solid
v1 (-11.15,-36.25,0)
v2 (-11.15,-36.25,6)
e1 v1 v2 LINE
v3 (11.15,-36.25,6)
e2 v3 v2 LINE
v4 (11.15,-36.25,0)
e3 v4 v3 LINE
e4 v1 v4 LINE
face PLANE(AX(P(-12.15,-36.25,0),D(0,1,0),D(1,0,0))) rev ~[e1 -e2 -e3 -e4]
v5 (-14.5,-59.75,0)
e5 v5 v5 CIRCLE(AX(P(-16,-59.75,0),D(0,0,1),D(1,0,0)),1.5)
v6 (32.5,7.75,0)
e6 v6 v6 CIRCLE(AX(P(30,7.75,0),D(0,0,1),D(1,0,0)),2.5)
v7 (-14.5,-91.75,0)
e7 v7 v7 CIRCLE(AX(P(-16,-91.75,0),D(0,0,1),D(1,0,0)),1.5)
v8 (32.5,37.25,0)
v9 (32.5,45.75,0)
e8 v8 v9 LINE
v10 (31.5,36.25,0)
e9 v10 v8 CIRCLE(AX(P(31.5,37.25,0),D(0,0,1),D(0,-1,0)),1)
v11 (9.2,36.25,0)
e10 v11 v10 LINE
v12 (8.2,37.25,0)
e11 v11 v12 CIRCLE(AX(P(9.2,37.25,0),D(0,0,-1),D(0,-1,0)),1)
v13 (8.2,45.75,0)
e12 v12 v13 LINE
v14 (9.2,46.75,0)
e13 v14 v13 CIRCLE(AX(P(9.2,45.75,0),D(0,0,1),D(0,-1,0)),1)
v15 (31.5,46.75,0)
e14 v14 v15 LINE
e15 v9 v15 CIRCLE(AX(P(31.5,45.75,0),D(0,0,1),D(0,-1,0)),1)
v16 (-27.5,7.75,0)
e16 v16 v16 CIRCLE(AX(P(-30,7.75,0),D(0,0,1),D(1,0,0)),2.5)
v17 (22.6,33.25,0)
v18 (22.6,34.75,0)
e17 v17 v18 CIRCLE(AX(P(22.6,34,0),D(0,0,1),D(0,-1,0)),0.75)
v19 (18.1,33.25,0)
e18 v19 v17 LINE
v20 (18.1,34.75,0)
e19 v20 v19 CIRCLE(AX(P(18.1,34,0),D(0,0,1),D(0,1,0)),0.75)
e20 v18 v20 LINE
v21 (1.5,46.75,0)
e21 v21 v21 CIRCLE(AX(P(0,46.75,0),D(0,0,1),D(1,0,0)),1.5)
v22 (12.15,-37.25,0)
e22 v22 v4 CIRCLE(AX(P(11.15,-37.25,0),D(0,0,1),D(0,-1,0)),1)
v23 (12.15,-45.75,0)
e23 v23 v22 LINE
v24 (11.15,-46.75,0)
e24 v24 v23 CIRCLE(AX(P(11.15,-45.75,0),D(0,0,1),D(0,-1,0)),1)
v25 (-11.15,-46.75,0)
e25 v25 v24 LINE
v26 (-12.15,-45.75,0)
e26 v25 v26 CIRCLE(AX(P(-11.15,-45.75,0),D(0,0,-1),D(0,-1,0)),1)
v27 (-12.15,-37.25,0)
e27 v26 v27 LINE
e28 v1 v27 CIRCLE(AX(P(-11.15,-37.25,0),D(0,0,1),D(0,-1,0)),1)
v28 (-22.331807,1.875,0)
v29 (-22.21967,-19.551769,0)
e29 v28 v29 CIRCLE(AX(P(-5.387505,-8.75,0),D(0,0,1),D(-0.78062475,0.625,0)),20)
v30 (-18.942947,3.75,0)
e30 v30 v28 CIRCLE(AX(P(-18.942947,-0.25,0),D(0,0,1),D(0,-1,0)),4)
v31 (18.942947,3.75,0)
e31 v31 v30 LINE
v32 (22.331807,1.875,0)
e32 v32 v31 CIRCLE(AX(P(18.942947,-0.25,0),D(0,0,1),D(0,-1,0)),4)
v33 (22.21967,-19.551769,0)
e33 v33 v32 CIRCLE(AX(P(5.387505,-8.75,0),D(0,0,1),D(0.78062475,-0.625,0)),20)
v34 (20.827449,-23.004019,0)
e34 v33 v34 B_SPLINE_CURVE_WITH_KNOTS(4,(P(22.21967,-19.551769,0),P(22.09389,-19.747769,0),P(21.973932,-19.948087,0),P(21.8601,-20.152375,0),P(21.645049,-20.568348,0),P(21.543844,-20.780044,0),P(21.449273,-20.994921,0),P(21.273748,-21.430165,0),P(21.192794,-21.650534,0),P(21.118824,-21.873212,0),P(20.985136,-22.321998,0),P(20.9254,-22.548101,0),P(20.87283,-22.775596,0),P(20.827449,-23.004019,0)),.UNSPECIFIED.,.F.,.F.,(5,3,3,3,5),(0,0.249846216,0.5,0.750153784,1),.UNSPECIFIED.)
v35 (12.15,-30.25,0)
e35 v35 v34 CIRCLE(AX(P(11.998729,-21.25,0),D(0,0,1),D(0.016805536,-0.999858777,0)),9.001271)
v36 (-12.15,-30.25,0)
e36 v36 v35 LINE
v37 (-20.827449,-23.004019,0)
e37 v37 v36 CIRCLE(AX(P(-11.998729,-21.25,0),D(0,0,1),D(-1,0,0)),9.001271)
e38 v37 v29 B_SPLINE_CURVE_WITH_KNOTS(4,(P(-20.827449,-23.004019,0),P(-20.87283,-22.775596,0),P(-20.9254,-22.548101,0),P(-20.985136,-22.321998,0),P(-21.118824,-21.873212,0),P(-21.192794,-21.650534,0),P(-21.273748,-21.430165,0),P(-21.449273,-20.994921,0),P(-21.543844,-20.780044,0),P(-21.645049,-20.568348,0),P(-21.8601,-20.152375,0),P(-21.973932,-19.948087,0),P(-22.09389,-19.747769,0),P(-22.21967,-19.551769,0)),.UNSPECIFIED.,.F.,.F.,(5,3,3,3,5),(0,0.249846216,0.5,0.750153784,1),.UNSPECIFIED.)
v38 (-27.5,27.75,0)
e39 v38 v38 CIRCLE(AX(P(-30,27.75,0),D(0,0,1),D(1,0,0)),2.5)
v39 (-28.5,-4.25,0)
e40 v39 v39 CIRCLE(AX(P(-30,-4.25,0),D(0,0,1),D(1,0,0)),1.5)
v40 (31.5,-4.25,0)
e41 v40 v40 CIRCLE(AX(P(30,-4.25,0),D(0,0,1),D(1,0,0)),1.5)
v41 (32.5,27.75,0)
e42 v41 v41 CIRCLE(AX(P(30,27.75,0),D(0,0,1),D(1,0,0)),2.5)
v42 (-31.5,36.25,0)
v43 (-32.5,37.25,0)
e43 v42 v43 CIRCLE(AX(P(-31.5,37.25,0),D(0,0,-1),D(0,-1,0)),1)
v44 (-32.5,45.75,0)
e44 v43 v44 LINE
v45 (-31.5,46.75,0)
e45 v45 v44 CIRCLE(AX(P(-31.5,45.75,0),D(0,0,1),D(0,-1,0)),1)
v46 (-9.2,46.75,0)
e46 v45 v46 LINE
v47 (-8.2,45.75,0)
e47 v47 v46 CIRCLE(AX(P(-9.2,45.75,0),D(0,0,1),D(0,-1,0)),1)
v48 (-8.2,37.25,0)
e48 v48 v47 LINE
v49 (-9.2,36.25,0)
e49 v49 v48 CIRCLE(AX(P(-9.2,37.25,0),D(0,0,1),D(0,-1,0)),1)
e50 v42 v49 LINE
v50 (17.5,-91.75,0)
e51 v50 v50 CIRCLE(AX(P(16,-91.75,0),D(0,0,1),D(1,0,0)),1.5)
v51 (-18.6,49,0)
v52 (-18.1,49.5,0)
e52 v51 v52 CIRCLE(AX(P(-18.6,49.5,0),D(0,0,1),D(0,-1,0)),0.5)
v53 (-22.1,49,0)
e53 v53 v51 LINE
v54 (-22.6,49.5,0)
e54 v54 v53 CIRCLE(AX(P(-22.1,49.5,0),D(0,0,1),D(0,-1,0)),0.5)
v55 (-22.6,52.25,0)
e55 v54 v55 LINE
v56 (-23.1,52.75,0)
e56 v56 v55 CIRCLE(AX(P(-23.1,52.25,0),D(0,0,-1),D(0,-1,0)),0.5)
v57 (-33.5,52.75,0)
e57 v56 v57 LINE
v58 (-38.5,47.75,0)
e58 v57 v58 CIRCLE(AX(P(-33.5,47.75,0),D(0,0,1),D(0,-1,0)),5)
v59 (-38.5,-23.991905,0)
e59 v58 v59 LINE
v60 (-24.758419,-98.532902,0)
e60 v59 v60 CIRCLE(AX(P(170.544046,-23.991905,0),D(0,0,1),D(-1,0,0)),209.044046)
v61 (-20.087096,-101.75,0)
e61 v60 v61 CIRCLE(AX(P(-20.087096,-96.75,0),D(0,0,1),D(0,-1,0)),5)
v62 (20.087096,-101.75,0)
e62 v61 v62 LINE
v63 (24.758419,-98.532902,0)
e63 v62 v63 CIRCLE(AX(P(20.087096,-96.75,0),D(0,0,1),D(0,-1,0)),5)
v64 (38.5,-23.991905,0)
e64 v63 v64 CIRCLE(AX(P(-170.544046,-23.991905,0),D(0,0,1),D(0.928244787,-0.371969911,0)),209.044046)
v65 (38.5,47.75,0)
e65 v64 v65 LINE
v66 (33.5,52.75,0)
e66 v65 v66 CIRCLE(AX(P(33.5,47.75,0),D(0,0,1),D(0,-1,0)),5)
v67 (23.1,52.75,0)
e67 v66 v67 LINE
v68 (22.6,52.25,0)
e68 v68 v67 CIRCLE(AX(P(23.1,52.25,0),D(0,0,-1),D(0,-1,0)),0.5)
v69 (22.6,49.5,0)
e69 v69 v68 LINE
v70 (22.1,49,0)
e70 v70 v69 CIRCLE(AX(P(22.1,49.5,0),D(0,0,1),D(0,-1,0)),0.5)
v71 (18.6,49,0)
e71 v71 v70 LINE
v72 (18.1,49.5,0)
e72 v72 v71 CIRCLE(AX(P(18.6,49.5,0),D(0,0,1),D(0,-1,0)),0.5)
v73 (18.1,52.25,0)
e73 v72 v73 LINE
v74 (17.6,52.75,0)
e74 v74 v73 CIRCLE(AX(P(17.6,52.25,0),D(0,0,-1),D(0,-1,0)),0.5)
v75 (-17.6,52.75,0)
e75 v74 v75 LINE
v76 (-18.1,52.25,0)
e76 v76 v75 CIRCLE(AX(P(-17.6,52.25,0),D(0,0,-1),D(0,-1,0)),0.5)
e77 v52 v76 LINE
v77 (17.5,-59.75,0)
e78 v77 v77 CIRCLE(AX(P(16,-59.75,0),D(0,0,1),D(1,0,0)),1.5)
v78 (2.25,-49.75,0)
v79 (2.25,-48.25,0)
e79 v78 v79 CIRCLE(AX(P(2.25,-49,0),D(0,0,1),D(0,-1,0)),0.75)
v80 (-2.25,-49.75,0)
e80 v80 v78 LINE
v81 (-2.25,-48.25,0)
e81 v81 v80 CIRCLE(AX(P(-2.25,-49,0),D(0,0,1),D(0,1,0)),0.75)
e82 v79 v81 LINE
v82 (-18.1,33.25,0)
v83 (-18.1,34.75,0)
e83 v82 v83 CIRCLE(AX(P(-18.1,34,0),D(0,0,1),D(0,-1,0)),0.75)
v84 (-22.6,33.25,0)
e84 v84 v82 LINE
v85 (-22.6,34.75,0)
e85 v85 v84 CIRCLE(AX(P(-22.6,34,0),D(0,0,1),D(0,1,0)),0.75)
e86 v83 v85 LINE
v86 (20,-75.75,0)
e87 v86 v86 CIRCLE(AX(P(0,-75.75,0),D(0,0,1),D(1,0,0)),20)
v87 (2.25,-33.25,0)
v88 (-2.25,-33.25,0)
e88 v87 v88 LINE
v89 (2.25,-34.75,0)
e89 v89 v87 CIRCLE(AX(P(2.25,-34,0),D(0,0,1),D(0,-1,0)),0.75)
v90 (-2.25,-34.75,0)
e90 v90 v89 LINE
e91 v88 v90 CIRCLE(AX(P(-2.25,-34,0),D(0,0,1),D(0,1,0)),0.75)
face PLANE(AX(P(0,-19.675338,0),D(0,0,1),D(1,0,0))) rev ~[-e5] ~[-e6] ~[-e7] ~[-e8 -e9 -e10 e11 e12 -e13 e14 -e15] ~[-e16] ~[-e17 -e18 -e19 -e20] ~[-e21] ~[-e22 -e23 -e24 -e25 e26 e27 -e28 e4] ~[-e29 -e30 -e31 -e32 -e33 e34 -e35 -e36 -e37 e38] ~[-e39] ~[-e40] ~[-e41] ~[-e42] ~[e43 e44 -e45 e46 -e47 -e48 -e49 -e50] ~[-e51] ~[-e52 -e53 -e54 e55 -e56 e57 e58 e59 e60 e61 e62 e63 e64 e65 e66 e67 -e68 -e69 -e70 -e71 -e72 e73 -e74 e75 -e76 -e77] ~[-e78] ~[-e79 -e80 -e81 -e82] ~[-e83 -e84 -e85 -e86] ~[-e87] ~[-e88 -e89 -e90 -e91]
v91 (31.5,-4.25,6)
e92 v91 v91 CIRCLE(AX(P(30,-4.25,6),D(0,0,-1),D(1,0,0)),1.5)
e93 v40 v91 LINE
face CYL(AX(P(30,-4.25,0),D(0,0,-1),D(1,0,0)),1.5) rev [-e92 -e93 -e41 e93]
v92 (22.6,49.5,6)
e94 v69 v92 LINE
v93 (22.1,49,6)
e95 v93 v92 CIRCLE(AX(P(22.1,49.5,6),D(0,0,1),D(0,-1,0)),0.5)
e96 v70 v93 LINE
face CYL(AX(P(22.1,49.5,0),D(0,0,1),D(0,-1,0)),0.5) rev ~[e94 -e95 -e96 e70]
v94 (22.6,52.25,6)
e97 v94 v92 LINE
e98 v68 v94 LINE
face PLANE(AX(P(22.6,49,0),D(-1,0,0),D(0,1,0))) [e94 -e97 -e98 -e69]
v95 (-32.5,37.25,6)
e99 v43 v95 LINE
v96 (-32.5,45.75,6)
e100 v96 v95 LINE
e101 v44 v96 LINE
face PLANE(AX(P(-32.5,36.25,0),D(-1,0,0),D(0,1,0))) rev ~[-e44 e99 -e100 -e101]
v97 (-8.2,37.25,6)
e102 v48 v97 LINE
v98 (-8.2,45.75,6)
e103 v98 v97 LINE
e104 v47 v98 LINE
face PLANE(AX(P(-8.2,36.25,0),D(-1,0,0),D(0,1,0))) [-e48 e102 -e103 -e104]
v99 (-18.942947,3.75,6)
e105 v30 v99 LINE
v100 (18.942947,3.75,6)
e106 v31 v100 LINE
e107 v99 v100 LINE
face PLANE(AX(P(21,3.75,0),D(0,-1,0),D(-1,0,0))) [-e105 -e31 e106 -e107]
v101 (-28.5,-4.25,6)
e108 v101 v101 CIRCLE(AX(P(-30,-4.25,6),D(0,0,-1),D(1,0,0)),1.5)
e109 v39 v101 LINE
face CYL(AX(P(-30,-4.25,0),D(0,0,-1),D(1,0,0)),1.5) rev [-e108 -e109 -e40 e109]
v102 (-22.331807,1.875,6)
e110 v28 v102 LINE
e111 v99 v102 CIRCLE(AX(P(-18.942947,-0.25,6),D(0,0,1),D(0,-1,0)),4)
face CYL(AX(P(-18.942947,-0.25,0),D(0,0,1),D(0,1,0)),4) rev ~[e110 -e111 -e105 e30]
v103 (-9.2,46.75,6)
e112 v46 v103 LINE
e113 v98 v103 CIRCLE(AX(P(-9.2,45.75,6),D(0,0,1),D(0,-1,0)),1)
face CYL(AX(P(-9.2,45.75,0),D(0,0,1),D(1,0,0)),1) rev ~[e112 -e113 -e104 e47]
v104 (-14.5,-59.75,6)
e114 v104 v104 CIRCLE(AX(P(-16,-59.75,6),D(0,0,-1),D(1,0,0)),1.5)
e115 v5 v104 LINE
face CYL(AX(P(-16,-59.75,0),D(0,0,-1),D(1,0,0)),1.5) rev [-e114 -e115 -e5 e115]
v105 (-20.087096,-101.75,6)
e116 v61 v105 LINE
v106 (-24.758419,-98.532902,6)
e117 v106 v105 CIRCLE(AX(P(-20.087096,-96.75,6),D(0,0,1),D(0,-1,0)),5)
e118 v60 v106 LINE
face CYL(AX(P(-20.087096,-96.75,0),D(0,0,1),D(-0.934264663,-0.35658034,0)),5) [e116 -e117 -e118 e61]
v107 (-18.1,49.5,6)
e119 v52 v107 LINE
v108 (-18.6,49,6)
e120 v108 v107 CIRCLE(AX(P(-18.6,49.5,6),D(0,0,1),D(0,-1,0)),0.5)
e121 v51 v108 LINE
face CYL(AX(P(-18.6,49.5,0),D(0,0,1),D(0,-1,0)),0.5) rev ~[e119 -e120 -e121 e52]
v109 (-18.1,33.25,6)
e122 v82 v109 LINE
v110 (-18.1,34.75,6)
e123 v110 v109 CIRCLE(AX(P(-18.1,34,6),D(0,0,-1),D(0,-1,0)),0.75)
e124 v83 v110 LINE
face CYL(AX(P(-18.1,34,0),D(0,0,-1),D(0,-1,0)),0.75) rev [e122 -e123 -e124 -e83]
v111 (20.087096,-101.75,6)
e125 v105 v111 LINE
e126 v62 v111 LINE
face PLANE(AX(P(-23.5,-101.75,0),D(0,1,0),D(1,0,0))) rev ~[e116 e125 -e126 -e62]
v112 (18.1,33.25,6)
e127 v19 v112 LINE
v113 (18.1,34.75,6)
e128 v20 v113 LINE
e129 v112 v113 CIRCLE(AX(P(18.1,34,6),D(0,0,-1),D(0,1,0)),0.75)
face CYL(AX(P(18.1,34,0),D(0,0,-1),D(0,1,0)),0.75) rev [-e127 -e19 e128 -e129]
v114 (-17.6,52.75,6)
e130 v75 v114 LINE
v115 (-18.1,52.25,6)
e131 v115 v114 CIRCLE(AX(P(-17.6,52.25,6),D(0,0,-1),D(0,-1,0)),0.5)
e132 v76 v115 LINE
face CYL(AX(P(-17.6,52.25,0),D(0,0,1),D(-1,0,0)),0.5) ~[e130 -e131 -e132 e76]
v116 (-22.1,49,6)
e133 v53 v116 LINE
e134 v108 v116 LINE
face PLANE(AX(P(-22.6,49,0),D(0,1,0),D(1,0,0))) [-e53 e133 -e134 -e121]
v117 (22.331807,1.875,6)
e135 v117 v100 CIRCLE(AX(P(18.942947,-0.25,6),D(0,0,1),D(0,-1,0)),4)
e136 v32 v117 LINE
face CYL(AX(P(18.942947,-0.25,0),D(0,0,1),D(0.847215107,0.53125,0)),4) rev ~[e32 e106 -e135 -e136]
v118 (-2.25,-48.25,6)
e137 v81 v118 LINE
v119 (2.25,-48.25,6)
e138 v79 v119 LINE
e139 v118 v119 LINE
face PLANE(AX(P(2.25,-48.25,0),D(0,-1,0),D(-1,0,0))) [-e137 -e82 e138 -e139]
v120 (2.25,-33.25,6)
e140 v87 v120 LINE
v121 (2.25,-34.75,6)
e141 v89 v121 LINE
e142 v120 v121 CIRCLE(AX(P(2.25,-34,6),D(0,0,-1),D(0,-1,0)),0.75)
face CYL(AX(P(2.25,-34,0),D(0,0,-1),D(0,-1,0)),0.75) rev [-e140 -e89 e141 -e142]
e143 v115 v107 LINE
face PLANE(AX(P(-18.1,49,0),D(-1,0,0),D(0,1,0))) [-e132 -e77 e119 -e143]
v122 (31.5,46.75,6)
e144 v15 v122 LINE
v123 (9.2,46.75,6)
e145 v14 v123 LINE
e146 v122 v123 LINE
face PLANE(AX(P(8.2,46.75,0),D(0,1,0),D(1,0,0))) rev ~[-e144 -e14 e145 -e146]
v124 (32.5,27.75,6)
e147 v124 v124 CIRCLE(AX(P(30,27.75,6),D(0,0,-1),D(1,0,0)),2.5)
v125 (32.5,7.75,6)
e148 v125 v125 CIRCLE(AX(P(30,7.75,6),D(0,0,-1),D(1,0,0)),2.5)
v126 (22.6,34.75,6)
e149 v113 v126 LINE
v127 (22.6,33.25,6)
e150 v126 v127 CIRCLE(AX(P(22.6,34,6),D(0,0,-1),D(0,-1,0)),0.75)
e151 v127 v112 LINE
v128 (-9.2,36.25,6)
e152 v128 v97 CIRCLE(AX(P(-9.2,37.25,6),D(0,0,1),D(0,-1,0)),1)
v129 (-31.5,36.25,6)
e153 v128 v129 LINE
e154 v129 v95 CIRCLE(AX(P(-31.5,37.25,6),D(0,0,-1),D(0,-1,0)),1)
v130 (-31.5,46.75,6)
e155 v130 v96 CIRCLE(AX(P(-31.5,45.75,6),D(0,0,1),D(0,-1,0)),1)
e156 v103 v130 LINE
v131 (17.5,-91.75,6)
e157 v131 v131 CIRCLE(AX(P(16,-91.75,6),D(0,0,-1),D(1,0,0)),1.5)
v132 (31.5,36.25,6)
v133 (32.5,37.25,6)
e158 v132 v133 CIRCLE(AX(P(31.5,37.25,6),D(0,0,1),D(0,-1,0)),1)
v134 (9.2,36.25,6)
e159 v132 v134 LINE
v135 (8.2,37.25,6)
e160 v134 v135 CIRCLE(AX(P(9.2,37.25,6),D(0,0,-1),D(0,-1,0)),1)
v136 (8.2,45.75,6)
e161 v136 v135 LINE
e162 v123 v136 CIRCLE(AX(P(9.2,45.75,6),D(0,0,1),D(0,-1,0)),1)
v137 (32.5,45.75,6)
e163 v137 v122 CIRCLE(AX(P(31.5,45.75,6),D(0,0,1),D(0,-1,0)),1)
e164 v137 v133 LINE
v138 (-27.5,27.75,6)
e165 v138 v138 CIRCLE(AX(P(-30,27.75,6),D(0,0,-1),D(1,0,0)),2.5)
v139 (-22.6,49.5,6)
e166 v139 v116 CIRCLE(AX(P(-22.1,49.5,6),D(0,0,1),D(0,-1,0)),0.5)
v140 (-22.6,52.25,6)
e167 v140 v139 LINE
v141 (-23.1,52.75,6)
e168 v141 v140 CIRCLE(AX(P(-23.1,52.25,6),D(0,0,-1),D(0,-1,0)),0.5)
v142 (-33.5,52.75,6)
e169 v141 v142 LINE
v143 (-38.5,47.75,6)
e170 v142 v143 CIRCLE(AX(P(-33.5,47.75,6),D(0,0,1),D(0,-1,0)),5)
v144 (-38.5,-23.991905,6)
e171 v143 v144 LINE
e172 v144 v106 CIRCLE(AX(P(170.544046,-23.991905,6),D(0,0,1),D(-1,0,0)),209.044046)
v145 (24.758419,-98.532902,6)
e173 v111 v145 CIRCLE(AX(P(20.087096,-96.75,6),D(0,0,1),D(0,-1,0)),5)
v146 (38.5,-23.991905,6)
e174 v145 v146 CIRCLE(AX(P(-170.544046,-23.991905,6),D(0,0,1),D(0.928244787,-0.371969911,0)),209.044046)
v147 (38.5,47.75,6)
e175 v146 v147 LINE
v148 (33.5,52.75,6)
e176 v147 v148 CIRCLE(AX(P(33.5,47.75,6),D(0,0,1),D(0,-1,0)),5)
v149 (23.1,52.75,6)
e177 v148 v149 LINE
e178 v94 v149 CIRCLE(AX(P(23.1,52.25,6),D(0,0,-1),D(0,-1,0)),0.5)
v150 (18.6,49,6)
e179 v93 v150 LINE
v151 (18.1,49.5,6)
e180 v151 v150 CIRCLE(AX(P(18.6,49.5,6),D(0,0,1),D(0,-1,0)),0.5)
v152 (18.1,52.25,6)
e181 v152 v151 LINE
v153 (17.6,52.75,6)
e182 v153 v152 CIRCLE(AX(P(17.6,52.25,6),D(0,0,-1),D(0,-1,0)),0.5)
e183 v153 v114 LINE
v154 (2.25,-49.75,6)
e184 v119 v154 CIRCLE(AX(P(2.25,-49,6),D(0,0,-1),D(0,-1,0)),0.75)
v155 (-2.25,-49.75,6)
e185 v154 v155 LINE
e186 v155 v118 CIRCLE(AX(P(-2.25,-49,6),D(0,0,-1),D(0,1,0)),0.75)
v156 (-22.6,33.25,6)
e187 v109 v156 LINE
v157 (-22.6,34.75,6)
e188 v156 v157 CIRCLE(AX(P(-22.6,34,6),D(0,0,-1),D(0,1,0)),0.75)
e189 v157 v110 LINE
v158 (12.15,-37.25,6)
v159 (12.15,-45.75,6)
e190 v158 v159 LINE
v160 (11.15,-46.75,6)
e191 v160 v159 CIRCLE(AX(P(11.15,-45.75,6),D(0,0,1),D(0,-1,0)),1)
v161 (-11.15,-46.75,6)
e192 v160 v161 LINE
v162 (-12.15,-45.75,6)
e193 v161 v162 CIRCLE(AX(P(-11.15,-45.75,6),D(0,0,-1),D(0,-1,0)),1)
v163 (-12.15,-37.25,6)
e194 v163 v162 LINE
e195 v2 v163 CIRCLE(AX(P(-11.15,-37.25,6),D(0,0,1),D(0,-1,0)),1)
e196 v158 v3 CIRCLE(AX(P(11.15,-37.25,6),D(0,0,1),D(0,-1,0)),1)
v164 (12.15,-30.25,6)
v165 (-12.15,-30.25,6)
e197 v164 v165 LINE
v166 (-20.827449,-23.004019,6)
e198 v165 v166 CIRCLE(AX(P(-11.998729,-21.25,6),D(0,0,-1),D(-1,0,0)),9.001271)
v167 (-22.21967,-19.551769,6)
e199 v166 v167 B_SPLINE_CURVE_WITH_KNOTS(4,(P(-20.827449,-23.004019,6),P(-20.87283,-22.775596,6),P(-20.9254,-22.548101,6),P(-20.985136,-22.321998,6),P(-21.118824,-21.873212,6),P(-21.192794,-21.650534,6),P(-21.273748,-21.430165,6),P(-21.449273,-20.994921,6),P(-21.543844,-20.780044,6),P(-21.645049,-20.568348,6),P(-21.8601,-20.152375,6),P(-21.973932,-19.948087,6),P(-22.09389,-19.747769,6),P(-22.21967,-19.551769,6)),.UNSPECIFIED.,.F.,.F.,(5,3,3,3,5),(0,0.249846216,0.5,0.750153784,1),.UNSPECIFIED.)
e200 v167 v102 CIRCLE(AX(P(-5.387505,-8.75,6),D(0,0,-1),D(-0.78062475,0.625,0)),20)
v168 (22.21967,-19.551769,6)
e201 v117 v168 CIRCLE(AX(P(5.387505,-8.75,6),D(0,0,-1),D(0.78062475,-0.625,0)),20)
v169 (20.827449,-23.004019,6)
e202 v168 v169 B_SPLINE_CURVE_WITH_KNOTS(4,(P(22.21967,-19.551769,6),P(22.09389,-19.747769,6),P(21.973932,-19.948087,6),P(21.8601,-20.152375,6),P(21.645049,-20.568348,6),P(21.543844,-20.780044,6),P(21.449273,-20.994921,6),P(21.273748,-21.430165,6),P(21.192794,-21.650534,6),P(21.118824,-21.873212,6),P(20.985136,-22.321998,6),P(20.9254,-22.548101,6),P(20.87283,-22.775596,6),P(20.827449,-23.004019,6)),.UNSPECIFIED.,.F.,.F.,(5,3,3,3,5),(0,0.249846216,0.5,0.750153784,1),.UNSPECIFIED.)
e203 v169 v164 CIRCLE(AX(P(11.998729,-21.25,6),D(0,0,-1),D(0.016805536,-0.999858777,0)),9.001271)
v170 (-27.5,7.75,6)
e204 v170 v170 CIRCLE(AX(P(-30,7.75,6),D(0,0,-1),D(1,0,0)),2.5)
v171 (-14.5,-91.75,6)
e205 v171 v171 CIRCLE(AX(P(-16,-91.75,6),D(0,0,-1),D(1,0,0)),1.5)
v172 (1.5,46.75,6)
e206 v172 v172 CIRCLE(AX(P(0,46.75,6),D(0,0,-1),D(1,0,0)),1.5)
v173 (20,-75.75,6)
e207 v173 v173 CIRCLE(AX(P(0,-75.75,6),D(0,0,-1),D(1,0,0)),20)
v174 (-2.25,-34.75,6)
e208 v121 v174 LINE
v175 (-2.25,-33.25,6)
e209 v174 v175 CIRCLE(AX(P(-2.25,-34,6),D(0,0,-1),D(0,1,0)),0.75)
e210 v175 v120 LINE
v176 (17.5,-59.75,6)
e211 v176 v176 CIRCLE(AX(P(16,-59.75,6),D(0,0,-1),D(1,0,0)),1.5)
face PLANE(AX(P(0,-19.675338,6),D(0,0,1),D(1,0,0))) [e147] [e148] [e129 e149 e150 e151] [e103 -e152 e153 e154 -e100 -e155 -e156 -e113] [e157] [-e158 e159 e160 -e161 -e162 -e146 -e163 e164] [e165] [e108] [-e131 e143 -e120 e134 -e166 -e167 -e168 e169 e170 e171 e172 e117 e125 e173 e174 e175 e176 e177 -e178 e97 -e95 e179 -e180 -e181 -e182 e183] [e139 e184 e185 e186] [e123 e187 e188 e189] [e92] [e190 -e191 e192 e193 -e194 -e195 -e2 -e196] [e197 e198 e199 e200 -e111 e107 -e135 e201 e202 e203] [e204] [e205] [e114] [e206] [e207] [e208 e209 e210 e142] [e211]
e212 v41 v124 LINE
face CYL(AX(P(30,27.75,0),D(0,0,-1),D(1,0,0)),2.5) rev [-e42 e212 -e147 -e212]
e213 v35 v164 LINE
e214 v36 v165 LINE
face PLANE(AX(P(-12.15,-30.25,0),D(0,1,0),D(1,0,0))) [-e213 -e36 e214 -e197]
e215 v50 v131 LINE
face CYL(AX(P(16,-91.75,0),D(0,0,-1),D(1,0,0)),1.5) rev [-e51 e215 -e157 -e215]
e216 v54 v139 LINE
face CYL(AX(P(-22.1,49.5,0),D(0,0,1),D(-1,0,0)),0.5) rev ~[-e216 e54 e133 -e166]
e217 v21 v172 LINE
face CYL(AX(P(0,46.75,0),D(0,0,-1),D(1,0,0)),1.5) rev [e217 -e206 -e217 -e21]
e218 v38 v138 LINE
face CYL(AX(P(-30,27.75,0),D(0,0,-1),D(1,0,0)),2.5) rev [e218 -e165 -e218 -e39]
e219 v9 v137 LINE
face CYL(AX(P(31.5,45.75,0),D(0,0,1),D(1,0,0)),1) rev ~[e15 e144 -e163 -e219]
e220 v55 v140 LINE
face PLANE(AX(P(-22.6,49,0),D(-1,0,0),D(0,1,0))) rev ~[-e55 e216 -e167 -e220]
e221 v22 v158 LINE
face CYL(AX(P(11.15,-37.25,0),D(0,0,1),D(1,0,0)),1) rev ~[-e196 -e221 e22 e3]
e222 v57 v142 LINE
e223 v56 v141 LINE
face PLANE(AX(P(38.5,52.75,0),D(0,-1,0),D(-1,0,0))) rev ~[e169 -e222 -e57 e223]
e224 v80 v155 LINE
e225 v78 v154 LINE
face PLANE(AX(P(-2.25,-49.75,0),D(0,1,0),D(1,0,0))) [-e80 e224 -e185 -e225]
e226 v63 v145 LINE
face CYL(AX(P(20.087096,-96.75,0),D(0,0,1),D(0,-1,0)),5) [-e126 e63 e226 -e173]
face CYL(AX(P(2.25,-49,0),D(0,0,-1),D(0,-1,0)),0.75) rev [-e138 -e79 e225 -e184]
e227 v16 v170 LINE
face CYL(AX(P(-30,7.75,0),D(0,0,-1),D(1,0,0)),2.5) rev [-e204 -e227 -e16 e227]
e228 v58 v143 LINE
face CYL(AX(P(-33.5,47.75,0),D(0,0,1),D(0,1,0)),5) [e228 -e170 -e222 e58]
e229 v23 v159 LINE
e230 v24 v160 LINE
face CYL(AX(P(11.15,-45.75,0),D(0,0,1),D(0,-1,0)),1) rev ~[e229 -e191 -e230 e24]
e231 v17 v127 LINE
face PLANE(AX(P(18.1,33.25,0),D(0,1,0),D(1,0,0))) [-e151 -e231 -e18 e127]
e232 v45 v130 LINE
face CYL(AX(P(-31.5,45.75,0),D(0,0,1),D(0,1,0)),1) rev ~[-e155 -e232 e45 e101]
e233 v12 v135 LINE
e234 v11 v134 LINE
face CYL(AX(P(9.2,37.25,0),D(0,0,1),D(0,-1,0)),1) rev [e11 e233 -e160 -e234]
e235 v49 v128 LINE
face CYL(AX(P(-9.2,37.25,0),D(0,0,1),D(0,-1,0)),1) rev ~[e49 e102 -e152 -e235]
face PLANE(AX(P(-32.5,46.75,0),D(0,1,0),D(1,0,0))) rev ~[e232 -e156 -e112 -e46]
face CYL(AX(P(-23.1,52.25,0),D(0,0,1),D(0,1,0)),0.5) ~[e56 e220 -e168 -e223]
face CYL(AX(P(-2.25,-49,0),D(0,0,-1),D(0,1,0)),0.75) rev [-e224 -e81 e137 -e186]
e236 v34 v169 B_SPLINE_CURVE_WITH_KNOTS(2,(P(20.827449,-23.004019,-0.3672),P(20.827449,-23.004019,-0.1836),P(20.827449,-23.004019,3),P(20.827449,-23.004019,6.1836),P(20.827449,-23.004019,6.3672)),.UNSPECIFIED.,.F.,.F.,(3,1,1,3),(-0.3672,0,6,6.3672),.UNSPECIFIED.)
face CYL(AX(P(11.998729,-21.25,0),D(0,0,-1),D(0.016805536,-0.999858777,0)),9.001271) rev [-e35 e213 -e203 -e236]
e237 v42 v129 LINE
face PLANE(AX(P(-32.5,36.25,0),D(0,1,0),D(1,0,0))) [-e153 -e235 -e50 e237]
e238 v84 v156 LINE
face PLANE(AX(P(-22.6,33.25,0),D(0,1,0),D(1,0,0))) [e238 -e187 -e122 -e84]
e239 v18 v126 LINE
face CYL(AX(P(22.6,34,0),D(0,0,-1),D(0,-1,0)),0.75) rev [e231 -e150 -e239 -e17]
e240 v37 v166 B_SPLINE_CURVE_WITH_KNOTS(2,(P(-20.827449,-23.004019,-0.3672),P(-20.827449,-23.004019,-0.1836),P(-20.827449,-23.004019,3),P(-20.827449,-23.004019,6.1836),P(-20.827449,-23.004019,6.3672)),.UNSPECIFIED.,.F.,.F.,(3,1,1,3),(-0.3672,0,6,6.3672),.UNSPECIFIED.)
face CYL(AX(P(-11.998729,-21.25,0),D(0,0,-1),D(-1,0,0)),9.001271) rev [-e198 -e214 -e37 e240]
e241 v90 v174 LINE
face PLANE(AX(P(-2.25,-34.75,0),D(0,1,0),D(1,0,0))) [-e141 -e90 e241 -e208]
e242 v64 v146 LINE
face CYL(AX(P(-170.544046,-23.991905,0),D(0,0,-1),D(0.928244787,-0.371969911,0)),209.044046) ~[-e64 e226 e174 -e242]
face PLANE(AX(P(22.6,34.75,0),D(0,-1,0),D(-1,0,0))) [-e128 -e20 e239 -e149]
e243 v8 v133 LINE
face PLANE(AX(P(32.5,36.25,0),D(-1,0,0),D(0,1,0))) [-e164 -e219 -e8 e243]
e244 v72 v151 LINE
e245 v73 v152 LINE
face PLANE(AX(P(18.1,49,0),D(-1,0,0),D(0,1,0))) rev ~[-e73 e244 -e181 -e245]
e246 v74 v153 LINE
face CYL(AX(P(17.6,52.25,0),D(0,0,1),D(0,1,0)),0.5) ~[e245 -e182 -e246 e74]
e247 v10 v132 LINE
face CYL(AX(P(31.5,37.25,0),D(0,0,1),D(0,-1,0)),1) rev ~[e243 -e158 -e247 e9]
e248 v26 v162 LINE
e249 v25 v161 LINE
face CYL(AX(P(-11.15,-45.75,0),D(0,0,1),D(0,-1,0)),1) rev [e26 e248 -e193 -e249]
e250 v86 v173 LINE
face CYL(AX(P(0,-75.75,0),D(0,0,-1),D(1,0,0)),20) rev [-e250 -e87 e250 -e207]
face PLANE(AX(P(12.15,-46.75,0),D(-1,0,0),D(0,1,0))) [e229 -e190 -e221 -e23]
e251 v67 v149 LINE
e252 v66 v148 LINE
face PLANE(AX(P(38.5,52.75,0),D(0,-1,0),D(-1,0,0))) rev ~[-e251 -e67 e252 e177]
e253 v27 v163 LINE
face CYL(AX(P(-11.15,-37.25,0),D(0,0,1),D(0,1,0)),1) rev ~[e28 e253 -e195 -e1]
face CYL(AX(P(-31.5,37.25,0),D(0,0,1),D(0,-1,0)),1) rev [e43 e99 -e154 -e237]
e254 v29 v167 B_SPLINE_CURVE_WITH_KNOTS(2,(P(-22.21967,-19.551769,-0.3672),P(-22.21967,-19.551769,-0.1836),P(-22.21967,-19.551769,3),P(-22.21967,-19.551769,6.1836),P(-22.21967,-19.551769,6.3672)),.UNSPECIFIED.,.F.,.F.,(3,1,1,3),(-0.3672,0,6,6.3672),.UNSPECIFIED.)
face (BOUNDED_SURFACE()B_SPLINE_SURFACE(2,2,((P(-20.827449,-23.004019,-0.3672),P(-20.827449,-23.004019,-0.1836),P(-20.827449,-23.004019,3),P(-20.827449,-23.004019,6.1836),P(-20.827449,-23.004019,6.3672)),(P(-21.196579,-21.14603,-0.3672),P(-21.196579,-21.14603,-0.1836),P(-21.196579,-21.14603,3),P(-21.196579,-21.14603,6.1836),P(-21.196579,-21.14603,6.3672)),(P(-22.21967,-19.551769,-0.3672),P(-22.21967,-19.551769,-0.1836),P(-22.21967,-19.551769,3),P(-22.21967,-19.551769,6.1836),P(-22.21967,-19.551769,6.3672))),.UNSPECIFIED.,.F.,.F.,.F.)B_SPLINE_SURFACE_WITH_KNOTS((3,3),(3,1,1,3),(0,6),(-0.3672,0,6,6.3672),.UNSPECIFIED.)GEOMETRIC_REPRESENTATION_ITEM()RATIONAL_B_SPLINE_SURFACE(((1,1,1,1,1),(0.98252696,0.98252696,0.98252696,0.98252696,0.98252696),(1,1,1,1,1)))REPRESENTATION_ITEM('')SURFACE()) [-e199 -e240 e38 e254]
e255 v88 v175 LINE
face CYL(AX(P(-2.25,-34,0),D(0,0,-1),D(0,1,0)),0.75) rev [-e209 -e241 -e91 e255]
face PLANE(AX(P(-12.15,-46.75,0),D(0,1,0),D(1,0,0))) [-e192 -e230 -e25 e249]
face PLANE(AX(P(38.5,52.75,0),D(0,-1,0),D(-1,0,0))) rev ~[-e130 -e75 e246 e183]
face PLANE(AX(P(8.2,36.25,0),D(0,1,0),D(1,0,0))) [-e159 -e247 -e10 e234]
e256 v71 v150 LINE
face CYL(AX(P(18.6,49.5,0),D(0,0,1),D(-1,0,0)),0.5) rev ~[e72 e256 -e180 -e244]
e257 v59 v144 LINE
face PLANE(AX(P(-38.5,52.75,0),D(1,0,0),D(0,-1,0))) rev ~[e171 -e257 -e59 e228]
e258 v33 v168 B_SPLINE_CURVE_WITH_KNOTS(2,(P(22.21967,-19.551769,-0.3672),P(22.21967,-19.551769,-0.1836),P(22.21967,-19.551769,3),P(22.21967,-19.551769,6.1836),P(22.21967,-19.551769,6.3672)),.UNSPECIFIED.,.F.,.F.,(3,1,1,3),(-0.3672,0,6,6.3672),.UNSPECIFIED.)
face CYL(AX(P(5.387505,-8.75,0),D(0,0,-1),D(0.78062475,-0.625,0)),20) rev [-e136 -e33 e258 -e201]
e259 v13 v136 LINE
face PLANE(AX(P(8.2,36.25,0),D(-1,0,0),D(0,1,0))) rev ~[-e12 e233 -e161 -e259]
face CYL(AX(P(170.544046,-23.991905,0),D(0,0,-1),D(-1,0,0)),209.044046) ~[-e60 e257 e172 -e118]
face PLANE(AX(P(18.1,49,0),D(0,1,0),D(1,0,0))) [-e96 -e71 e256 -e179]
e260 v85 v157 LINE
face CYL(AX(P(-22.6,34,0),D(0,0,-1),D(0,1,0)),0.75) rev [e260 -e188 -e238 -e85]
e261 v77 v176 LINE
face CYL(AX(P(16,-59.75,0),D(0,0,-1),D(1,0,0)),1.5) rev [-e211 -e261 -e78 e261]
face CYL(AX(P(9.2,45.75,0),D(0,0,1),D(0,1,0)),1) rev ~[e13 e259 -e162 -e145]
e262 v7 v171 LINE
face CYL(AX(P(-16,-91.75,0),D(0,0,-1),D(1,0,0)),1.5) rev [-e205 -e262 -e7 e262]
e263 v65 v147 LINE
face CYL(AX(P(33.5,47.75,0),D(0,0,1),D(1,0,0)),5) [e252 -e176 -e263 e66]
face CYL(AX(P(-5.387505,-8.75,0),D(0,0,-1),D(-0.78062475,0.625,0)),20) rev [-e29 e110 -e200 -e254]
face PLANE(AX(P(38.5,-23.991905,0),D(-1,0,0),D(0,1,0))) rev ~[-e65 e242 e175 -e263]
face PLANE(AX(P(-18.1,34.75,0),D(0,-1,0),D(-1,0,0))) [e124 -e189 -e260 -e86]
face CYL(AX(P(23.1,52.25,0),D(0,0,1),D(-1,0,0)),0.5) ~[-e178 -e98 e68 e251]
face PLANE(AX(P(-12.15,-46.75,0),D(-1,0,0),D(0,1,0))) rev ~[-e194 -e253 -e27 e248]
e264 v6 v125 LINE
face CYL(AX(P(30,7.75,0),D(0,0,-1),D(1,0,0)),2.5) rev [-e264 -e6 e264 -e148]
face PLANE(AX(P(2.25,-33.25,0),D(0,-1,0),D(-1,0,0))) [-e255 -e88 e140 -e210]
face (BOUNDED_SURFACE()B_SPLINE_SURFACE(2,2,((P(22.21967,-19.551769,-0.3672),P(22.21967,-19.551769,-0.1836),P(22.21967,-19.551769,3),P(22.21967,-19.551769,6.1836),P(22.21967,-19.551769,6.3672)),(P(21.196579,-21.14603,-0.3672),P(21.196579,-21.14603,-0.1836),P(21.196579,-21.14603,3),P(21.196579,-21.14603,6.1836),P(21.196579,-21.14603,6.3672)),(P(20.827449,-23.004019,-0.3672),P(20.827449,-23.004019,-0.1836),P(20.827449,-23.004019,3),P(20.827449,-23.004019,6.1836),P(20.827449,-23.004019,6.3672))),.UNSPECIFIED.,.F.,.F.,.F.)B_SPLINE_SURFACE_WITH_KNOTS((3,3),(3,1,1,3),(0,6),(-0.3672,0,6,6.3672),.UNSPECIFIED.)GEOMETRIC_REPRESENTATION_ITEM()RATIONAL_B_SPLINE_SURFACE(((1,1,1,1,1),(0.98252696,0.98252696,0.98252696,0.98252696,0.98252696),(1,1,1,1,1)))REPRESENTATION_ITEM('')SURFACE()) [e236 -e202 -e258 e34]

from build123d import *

# Parameters (mm, degrees)
F2_DEPTH = 6
F1_W     = 24.3
F1_H     = 10.5
F1_R     = 2.5
F1_W_2   = 4.5
F1_H_2   = 3.75
F1_R_2   = 1.5
F1_R_3   = 20
F3_DEPTH = 6.001
F4_R     = 1
F5_R     = 0.5
F6_R     = 4
F7_R     = 5
F8_R     = 10


# Not quite as in the source:
# - a feature names something its author has since deleted; it is built from what else it names


with BuildPart() as f2:
    # F0 (on Top) → F2 (new body)
    with BuildSketch(Plane.XY):
        with BuildLine():
            Line((-38.5, 52.75), (-38.5, 41.5))
            Line((-38.5, 41.5), (-38.5, -23.99190475))
            ThreePointArc((-38.5, -23.99190475), (-34.7157474887, -63.5877422109), (-23.5, -101.75))
            Line((-23.5, -101.75), (23.5, -101.75))
            ThreePointArc((23.5, -101.75), (34.7157474887, -63.5877422109), (38.5, -23.99190475))
            Line((38.5, -23.99190475), (38.5, 41.5))
            Line((38.5, 41.5), (38.5, 52.75))
            Line((38.5, 52.75), (-38.5, 52.75))
        make_face()
    extrude(amount=F2_DEPTH)

    # F1 (on Top) → F3 (cut, through all)
    with BuildSketch(Plane.XY):
        with Locations((0, -41.5)):
            Rectangle(F1_W, F1_H)
        with BuildLine():
            ThreePointArc((-2.25, -33.25), (-3, -34), (-2.25, -34.75))
            Line((-2.25, -34.75), (2.25, -34.75))
            ThreePointArc((2.25, -34.75), (3, -34), (2.25, -33.25))
            Line((2.25, -33.25), (-2.25, -33.25))
        make_face()
        with BuildLine():
            ThreePointArc((-21, -21.25), (-18.4168483179, -27.5611508459), (-12.15, -30.25))
            Line((-12.15, -30.25), (12.15, -30.25))
            ThreePointArc((12.15, -30.25), (18.4168483179, -27.5611508459), (21, -21.25))
            ThreePointArc((21, -21.25), (25.387505004, -8.75), (21, 3.75))
            Line((21, 3.75), (-21, 3.75))
            ThreePointArc((-21, 3.75), (-25.387505004, -8.75), (-21, -21.25))
        make_face()
        with Locations((-30, 7.75)):
            Circle(F1_R)
        with Locations((-30, 27.75)):
            Circle(F1_R)
        with Locations((30, 7.75)):
            Circle(F1_R)
        with Locations((30, 27.75)):
            Circle(F1_R)
        with Locations((20.35, 41.5)):
            Rectangle(F1_W, F1_H)
        with BuildLine():
            ThreePointArc((18.1, 34.75), (17.35, 34), (18.1, 33.25))
            Line((18.1, 33.25), (22.6, 33.25))
            ThreePointArc((22.6, 33.25), (23.35, 34), (22.6, 34.75))
            Line((22.6, 34.75), (18.1, 34.75))
        make_face()
        with BuildLine():
            ThreePointArc((-22.6, 34.75), (-23.35, 34), (-22.6, 33.25))
            Line((-22.6, 33.25), (-18.1, 33.25))
            ThreePointArc((-18.1, 33.25), (-17.35, 34), (-18.1, 34.75))
            Line((-18.1, 34.75), (-22.6, 34.75))
        make_face()
        with Locations((-20.35, 41.5)):
            Rectangle(F1_W, F1_H)
        with Locations((-20.35, 50.875)):
            Rectangle(F1_W_2, F1_H_2)
        with Locations((20.35, 50.875)):
            Rectangle(F1_W_2, F1_H_2)
        with Locations((0, 46.75)):
            Circle(F1_R_2)
        with Locations((30, -4.25)):
            Circle(F1_R_2)
        with Locations((-30, -4.25)):
            Circle(F1_R_2)
        with Locations((0, -75.75)):
            Circle(F1_R_3)
        with BuildLine():
            ThreePointArc((-2.25, -48.25), (-3, -49), (-2.25, -49.75))
            Line((-2.25, -49.75), (2.25, -49.75))
            ThreePointArc((2.25, -49.75), (3, -49), (2.25, -48.25))
            Line((2.25, -48.25), (-2.25, -48.25))
        make_face()
        with Locations((16, -59.75)):
            Circle(F1_R_2)
        with Locations((-16, -59.75)):
            Circle(F1_R_2)
        with Locations((16, -91.75)):
            Circle(F1_R_2)
        with Locations((-16, -91.75)):
            Circle(F1_R_2)
    extrude(amount=F3_DEPTH, mode=Mode.SUBTRACT)

    # F4
    f4_edges = [f2.edges().sort_by_distance(p)[0] for p in [
        (12.15, -36.25, 3),
        (-12.15, -36.25, 3),
        (-12.15, -46.75, 3),
        (12.15, -46.75, 3),
        (8.2, 46.75, 3),
        (-32.5, 46.75, 3),
        (-32.5, 36.25, 3),
        (-8.2, 46.75, 3),
        (-8.2, 36.25, 3),
        (32.5, 36.25, 3),
        (8.2, 36.25, 3),
        (32.5, 46.75, 3),
    ]]
    fillet(f4_edges, radius=F4_R)

    # F5
    f5_edges = [f2.edges().sort_by_distance(p)[0] for p in [
        (18.1, 49, 3),
        (22.6, 49, 3),
        (-18.1, 49, 3),
        (-22.6, 49, 3),
        (-22.6, 52.75, 3),
        (-18.1, 52.75, 3),
        (18.1, 52.75, 3),
        (22.6, 52.75, 3),
    ]]
    fillet(f5_edges, radius=F5_R)

    # F6
    f6_edges = [f2.edges().sort_by_distance(p)[0] for p in [
        (-21, 3.75, 3),
        (21, 3.75, 3),
    ]]
    fillet(f6_edges, radius=F6_R)

    # F7
    f7_edges = [f2.edges().sort_by_distance(p)[0] for p in [
        (-23.5, -101.75, 3),
        (23.5, -101.75, 3),
        (-38.5, 52.75, 3),
        (38.5, 52.75, 3),
    ]]
    fillet(f7_edges, radius=F7_R)

    # F8
    f8_edges = [f2.edges().sort_by_distance(p)[0] for p in [
        (-21, -21.25, 3),
        (21, -21.25, 3),
    ]]
    fillet(f8_edges, radius=F8_R)


solid = f2.part
